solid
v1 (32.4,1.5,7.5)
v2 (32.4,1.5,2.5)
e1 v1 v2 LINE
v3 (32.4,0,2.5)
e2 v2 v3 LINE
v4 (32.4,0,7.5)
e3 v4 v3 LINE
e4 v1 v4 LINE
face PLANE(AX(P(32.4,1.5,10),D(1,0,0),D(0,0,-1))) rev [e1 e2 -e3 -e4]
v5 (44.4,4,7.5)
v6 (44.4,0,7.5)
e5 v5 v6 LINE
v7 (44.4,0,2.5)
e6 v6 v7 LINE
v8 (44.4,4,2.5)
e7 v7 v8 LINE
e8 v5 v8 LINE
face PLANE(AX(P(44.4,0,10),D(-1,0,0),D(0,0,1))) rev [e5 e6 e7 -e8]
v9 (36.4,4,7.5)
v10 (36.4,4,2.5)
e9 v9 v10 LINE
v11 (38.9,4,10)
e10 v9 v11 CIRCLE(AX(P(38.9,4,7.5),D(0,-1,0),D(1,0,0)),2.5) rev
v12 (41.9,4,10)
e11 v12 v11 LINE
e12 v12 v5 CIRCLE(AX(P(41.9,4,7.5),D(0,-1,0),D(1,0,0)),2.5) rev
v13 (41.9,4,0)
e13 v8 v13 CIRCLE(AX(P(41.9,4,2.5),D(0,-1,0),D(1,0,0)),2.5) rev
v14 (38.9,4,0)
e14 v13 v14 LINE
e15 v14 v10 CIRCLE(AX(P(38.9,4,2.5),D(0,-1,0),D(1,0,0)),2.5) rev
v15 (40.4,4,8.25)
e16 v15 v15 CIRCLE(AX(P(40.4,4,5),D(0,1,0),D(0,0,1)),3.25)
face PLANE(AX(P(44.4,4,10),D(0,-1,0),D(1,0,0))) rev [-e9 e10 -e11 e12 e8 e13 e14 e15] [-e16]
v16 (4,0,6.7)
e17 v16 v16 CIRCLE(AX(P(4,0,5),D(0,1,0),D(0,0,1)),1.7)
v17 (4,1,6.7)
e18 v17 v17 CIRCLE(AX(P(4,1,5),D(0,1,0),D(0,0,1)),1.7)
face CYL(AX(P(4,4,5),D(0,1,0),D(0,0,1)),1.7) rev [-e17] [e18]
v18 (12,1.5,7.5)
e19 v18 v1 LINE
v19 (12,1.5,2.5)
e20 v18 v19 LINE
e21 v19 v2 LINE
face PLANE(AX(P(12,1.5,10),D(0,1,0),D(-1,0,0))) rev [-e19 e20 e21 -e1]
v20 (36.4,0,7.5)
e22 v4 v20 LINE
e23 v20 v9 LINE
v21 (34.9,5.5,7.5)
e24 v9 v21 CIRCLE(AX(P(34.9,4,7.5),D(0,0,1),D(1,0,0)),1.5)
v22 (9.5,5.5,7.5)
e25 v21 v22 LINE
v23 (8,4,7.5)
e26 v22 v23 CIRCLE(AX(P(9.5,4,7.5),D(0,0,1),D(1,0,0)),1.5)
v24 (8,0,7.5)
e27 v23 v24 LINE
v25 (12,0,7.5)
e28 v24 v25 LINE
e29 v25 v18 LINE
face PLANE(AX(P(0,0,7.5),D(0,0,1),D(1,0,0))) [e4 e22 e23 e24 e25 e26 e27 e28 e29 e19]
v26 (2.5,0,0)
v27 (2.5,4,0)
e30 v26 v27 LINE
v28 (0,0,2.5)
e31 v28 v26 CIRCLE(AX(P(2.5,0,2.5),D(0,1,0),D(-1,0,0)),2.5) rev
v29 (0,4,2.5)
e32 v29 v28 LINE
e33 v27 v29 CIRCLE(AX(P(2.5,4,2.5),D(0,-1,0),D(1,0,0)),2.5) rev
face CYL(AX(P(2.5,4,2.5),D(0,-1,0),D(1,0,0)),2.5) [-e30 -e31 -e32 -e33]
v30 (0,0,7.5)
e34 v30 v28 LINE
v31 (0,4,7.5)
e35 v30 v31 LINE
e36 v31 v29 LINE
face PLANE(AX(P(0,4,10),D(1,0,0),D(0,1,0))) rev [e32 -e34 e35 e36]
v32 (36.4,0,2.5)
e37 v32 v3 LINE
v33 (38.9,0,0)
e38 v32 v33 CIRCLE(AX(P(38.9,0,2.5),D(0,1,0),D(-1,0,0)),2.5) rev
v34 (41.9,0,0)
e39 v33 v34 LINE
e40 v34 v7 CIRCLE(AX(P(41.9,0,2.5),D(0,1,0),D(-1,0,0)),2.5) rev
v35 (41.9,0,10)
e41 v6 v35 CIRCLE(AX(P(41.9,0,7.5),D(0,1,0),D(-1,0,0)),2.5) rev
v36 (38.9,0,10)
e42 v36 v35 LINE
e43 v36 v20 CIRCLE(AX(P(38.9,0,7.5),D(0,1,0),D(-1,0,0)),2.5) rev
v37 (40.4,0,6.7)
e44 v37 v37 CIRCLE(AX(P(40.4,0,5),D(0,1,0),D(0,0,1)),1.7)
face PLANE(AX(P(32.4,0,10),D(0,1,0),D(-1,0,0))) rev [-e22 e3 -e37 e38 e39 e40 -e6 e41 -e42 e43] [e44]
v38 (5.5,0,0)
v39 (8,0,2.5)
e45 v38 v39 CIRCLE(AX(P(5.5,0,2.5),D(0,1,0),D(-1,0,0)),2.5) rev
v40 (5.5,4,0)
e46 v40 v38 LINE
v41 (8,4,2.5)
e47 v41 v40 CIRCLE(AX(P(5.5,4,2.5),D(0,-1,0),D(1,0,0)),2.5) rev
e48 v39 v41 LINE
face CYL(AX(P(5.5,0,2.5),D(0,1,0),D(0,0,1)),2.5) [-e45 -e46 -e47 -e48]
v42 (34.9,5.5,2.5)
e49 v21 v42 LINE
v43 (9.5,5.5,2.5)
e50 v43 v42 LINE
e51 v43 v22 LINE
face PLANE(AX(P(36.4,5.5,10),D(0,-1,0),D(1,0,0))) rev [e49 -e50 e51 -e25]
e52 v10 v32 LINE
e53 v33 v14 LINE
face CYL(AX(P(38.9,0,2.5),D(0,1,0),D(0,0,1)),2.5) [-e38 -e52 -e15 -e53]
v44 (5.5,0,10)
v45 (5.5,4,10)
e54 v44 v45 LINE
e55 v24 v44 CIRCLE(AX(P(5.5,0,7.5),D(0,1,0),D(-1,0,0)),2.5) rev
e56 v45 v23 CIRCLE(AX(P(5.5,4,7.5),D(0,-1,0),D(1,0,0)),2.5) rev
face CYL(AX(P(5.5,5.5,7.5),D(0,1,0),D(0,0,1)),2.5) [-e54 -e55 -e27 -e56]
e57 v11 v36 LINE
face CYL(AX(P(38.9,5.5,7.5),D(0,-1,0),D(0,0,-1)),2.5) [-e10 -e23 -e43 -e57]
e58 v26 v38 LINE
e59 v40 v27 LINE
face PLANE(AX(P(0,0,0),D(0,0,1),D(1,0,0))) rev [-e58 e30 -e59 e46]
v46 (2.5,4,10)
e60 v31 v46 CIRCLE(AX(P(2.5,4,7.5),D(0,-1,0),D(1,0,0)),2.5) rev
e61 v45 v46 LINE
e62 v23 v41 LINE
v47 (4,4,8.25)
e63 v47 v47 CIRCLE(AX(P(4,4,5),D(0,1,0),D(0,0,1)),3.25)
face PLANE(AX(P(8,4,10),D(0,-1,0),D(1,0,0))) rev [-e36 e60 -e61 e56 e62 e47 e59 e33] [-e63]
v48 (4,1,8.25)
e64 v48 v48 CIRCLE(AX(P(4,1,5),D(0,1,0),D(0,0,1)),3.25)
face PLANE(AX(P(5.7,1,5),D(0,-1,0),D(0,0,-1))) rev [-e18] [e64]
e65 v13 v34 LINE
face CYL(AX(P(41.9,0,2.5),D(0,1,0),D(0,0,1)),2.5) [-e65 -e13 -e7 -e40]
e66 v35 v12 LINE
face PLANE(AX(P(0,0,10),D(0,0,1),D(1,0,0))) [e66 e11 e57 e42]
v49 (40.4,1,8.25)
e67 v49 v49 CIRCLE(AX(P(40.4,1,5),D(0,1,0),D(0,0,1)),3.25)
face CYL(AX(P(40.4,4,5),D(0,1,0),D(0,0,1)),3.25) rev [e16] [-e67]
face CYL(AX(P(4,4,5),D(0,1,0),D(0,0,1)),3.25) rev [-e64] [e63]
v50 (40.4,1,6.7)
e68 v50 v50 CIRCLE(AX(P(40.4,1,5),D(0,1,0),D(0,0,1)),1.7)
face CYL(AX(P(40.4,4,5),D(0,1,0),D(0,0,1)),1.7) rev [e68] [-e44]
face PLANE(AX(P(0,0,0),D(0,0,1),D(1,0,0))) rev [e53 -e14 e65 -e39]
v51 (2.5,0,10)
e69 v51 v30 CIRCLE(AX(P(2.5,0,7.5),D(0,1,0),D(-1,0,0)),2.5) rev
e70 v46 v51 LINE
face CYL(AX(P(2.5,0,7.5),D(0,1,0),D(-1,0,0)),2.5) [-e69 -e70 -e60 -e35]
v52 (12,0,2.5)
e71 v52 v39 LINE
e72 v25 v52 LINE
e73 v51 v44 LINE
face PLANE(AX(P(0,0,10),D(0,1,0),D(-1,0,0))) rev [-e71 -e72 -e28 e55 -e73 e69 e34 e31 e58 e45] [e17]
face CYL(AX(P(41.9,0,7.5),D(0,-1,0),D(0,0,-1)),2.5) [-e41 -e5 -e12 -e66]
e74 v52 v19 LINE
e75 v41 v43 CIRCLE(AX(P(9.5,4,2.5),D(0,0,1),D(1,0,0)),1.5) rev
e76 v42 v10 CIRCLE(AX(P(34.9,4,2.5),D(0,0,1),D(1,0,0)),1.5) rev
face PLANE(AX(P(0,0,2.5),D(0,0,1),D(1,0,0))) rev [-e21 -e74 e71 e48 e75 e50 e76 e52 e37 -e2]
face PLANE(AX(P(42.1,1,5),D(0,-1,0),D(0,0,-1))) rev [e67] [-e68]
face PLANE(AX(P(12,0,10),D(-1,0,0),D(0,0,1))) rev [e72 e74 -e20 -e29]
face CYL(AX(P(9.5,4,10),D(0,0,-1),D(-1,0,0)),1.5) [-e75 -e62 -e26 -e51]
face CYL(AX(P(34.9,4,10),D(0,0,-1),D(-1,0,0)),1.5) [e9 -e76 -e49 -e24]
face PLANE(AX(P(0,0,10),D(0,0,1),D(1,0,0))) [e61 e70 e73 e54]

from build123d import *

# Parameters (mm, degrees)
RESSALTO_EXTRUS_O1_DEPTH          = 10
REBAIXO_PARA_SHCS_M31_D           = 3.4
REBAIXO_PARA_SHCS_M31_CBORE_D     = 6.5
REBAIXO_PARA_SHCS_M31_CBORE_DEPTH = 3
ESBO_O4_W                         = 28.4
ESBO_O4_H                         = 5.5
CORTE_EXTRUS_O1_DEPTH             = 2.5
ESBO_O5_W                         = 28.4
ESBO_O5_H                         = 5.5
CORTE_EXTRUS_O2_DEPTH             = 2.5
FILETE1_R                         = 2.5
FILETE2_R                         = 1.5


with BuildPart() as part:
    # Esboço1 → Ressalto-extrusão1 (new body)
    with BuildSketch(Plane.XY):
        Polygon((0, 0), (12, 0), (12, 1.5), (32.4, 1.5), (32.4, 0), (44.4, 0), (44.4, 4), (36.4, 4), (36.4, 5.5), (8, 5.5), (8, 4), (0, 4), align=None)
    extrude(amount=RESSALTO_EXTRUS_O1_DEPTH)

    # Rebaixo para SHCS M31 (through all)
    with Locations(Plane(origin=(0, 4, 0), x_dir=(1, 0, 0), z_dir=(0, 1, 0))):
        with Locations((4, -5), (40.4, -5)):
            CounterBoreHole(REBAIXO_PARA_SHCS_M31_D / 2, REBAIXO_PARA_SHCS_M31_CBORE_D / 2, REBAIXO_PARA_SHCS_M31_CBORE_DEPTH)

    # Esboço4 → Corte-extrusão1 (cut)
    with BuildSketch(Plane.XY.offset(10)):
        with Locations((22.2, 2.75)):
            Rectangle(ESBO_O4_W, ESBO_O4_H)
    extrude(amount=-CORTE_EXTRUS_O1_DEPTH, mode=Mode.SUBTRACT)

    # Esboço5 → Corte-extrusão2 (cut)
    with BuildSketch(Plane(origin=(0, 0, 0), x_dir=(-1, 0, 0), z_dir=(0, 0, -1))):
        with Locations((-22.2, 2.75)):
            Rectangle(ESBO_O5_W, ESBO_O5_H)
    extrude(amount=-CORTE_EXTRUS_O2_DEPTH, mode=Mode.SUBTRACT)

    # Filete1
    filete1_edges = [part.edges().sort_by_distance(p)[0] for p in [
        (8, 2, 10),
        (0, 2, 10),
        (0, 2, 0),
        (8, 2, 0),
        (36.4, 2, 10),
        (44.4, 2, 10),
        (44.4, 2, 0),
        (36.4, 2, 0),
    ]]
    fillet(filete1_edges, radius=FILETE1_R - 0.0001)  # a hair under: the kernel refuses the full size

    # Filete2
    filete2_edges = [part.edges().sort_by_distance(p)[0] for p in [
        (36.4, 5.5, 5),
        (8, 5.5, 5),
    ]]
    fillet(filete2_edges, radius=FILETE2_R - 0.0001)  # a hair under: the kernel refuses the full size


solid = part.part
